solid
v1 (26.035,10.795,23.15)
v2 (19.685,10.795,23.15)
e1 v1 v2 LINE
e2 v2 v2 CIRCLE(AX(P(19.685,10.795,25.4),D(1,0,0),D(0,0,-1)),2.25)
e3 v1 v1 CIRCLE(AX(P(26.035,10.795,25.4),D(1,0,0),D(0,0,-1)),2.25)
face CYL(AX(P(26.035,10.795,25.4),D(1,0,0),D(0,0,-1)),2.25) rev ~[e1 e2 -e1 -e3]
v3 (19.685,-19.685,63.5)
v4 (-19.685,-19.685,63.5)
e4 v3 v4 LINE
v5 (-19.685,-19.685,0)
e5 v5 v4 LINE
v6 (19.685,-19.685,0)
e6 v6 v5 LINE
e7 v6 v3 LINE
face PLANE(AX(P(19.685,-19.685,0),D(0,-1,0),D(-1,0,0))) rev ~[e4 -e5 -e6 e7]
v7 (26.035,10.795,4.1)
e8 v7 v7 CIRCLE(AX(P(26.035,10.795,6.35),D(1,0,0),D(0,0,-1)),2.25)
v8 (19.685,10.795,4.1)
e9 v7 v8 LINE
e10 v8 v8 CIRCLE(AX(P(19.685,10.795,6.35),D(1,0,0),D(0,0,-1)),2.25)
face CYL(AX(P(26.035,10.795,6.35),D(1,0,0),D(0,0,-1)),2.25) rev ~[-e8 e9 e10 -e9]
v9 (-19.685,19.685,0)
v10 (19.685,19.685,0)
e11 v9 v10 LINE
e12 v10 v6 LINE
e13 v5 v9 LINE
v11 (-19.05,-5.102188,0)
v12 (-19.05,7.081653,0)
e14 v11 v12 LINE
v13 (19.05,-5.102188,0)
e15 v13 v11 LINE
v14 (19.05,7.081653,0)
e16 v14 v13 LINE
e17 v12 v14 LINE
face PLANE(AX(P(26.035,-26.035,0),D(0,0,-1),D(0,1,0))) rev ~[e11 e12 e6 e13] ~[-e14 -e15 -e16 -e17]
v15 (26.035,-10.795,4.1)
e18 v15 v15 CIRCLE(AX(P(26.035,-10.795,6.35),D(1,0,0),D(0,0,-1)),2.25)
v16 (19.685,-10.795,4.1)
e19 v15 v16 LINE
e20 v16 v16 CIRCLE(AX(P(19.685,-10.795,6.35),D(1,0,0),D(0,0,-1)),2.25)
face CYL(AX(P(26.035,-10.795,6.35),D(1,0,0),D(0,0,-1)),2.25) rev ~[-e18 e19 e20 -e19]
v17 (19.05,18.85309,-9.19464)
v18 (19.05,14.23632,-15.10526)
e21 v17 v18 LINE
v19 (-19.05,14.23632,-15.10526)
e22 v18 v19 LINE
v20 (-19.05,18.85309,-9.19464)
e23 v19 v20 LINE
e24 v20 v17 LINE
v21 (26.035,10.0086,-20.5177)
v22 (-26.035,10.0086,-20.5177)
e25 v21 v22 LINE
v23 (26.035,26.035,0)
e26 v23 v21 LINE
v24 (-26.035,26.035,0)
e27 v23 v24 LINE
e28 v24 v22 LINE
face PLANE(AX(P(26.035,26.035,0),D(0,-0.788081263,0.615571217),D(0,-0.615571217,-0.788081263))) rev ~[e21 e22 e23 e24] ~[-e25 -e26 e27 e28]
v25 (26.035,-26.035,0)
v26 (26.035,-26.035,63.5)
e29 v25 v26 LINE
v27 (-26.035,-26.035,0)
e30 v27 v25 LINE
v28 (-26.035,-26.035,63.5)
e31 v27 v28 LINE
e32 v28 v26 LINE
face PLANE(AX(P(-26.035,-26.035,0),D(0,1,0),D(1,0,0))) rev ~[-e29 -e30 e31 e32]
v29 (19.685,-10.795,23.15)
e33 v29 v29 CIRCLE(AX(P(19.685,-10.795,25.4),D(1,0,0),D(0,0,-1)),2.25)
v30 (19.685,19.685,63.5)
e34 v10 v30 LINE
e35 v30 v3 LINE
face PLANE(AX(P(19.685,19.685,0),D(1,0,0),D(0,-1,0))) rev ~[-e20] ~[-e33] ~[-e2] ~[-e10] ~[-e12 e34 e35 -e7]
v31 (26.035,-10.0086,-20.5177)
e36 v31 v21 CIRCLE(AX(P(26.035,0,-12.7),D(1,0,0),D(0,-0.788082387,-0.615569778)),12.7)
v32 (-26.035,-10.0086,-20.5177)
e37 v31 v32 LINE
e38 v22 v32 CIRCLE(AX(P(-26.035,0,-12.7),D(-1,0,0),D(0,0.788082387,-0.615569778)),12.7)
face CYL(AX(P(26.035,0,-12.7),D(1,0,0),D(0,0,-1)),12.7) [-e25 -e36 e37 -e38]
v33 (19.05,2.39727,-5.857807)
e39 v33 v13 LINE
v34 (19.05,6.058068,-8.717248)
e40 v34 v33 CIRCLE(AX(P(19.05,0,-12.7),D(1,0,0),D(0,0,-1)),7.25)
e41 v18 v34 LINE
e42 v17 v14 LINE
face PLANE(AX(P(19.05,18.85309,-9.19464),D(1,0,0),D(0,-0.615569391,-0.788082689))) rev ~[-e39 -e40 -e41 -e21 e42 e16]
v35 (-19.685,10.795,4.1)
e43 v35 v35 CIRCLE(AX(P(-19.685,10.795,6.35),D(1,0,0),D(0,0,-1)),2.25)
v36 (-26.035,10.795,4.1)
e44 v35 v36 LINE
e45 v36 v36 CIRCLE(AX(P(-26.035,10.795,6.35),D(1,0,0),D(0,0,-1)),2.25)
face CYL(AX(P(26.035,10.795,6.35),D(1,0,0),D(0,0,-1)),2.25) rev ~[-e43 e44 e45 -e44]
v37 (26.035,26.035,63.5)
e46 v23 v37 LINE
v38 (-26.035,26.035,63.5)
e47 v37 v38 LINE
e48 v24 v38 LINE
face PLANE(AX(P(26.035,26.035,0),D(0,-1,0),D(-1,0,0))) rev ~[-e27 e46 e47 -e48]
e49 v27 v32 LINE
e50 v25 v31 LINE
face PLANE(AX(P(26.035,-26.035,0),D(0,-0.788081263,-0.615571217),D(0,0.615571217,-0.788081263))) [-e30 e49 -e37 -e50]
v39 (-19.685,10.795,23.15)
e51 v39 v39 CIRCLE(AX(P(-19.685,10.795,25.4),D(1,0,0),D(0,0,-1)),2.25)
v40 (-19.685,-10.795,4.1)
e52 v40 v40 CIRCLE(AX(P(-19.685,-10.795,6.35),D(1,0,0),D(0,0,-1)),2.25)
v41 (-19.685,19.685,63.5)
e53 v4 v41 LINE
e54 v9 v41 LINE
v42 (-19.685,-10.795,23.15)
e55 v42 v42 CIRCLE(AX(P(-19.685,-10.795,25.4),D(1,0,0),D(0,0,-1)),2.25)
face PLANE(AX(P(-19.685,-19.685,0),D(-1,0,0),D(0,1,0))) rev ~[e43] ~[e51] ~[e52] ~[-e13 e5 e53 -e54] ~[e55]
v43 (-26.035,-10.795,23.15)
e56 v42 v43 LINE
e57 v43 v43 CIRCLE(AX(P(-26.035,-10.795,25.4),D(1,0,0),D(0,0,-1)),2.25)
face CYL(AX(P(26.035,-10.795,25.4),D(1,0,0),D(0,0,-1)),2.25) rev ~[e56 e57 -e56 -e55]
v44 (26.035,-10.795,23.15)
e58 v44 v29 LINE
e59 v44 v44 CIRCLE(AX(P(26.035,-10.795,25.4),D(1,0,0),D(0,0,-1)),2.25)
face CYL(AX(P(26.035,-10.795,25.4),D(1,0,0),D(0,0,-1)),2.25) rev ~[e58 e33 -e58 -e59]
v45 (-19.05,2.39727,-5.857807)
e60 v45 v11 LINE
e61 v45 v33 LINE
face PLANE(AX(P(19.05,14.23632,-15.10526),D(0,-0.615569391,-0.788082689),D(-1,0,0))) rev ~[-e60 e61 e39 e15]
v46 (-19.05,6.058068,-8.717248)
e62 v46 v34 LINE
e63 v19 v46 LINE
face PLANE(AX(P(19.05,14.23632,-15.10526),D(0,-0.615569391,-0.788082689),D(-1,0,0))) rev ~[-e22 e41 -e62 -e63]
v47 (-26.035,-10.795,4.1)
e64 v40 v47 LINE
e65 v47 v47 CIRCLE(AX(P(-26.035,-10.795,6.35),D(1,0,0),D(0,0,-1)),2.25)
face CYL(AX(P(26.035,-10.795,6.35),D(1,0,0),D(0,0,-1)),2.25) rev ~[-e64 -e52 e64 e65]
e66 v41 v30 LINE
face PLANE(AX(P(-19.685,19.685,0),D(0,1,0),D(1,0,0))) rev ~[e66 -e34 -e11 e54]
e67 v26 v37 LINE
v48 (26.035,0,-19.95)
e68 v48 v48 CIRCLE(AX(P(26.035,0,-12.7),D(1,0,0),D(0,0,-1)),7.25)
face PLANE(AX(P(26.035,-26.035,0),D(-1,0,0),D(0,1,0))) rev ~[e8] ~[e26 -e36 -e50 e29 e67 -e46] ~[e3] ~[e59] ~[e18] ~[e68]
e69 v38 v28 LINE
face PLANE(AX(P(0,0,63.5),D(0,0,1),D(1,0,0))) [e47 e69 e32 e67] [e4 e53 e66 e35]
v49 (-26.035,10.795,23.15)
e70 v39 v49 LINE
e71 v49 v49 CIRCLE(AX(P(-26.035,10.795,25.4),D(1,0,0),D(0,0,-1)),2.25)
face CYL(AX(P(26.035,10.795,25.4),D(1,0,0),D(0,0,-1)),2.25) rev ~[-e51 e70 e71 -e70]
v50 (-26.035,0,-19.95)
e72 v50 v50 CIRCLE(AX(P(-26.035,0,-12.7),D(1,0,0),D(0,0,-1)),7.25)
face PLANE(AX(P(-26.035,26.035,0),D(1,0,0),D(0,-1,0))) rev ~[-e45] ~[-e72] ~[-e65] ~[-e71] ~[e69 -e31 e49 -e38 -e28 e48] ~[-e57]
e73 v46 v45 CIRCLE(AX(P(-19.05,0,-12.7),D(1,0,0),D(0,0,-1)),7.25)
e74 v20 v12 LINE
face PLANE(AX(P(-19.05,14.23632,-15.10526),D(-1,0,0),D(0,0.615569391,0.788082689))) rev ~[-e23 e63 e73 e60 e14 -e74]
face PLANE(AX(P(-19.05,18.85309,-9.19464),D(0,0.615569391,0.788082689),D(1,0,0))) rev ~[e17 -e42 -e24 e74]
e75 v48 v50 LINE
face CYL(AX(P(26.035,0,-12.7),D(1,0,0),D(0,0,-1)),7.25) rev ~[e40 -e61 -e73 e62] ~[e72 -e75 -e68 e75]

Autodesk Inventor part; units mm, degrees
ref_plane "YZ Plane" through (0, 0, 0) normal (1, 0, 0) x (0, 1, 0)
ref_plane "XZ Plane" through (0, 0, 0) normal (0, 1, 0) x (-1, 0, 0)
ref_plane "XY Plane" through (0, 0, 0) normal (0, 0, 1) x (1, 0, 0)
sketch "Sketch1" plane through (0, 0, 0) normal (0, 0, 1) x (1, 0, 0)
  line L0 (19.685, -19.685) -> (-19.685, -19.685)
  line L1 (-19.685, -19.685) -> (-19.685, 19.685)
  line L2 (-19.685, 19.685) -> (19.685, 19.685)
  line L3 (19.685, 19.685) -> (19.685, -19.685)
  line L4 (19.685, -19.685) -> (-19.685, 19.685) construction
  line L5 (-19.685, -19.685) -> (19.685, 19.685) construction
  line L6 (26.035, 26.035) -> (-26.035, 26.035)
  line L7 (-26.035, 26.035) -> (-26.035, -26.035)
  line L8 (-26.035, -26.035) -> (26.035, -26.035)
  line L9 (26.035, -26.035) -> (26.035, 26.035)
  point P0 (0, 0)
  dimension "d0" = 39.37
  dimension "d1" = 39.37
  dimension "d2" = 6.35
extrude "Extrusion1" add sketch "Sketch1" along normal blind 63.5
sketch "Sketch2" plane through (26.035, -26.035, 0) normal (1, 0, 0) x (0, 0, -1)
  line L0 (-63.5, 45.72) -> (-63.5, 6.35) construction
  line L1 (-63.5, 26.035) -> (50.8, 26.035) construction
  circle A0 centre (12.7, 26.035) radius 7.25
  line L2 (0, 0) -> (0, 52.07) projected
  circle A1 centre (12.7, 26.035) radius 12.7
  line L3 (0, 52.07) -> (-63.5, 52.07) projected
  line L4 (0, 52.07) -> (20.5177, 36.0436)
  line L5 (0, 0) -> (-63.5, 0) projected
  line L6 (0, 0) -> (20.5177, 16.0264)
  point P0 (0, 26.035)
  dimension "d5" = 114.3
  dimension "d6" = 14.5
  dimension "d7" = 12.7
  dimension "d8" = 25.4
extrude "Extrusion2" add sketch "Sketch2" against normal up to surface (52.07 mm away)
sketch "Sketch3" plane through (26.035, -26.035, 63.5) normal (1, 0, 0) x (0, 0, -1)
  circle A0 centre (76.2, 26.035) radius 7.25 projected
  line L0 (63.5, 52.07) -> (0, 52.07) projected
  line L1 (0, 0) -> (0, 52.07) projected
  line L2 (63.5, 0) -> (0, 0) projected
  line L3 (63.5, 0) -> (84.0177, 16.0264) projected
  arc A1 (84.0177, 16.0264) -> (84.0177, 36.0436) centre (76.2, 26.035) ccw projected
  line L4 (84.0177, 36.0436) -> (63.5, 52.07) projected
  line L5 (63.5, 45.72) -> (63.5, 6.35) construction
  circle A2 centre (57.15, 36.83) radius 2.25
  line L6 (63.5, 45.72) -> (0, 45.72) construction
  line L7 (63.5, 45.72) -> (0, 45.72) construction
  line L8 (63.5, 6.35) -> (0, 6.35) construction
  line L9 (63.5, 6.35) -> (0, 6.35) construction
  circle A3 centre (57.15, 15.24) radius 2.25
  circle A4 centre (38.1, 36.83) radius 2.25
  circle A5 centre (38.1, 15.24) radius 2.25
  point P0 (63.5, 26.035)
  dimension "d11" = 4.5
  dimension "d12" = 6.35
  dimension "d13" = 8.89
  dimension "d14" = 4.5
  dimension "d15" = 6.35
  dimension "d16" = 8.89
  dimension "d17" = 4.5
  dimension "d18" = 19.05
  dimension "d19" = 8.89
  dimension "d20" = 4.5
  dimension "d21" = 19.05
  dimension "d22" = 8.89
extrude "Extrusion3" cut sketch "Sketch3" against normal through all contours A2 | A3 | A4 | A5
sketch "Sketch5" plane through (-26.035, 26.035, 0) normal (0, 0.7880827, -0.6155694) x (1, 0, 0)
  line L0 (0, 26.035) -> (0, 0) projected
  line L1 (52.07, 0) -> (0, 0) projected
  line L2 (52.07, 26.035) -> (52.07, 0) projected
  line L3 (52.07, 26.035) -> (0, 26.035) projected
  line L4 (6.35, 3.9089) -> (45.72, 3.9089) construction
  line L5 (26.035, 3.9089) -> (26.035, 26.035) construction
  line L6 (6.35, 15.4171) -> (0, 15.4171) construction
  line L7 (0, 15.4171) -> (52.07, 15.4171) construction
  line L8 (52.07, 15.4171) -> (45.72, 15.4171) construction
  line L9 (45.085, 19.1671) -> (6.985, 19.1671)
  line L10 (6.985, 19.1671) -> (6.985, 11.6671)
  line L11 (6.985, 11.6671) -> (45.085, 11.6671)
  line L12 (45.085, 11.6671) -> (45.085, 19.1671)
  line L13 (45.085, 19.1671) -> (6.985, 11.6671) construction
  line L14 (6.985, 19.1671) -> (45.085, 11.6671) construction
  point P0 (26.035, 16.0264)
  point P1 (26.035, 15.4171)
  dimension "d30" = 38.1
  dimension "d31" = 7.5
extrude "Extrusion5" cut sketch "Sketch5" against normal up to surface contours L12 L11 L10 L9 surface through (19.685, -19.685, 0) normal (0, 1, 0)
properties part number "CS_Climb_Outer_Tube_End_Cap"
